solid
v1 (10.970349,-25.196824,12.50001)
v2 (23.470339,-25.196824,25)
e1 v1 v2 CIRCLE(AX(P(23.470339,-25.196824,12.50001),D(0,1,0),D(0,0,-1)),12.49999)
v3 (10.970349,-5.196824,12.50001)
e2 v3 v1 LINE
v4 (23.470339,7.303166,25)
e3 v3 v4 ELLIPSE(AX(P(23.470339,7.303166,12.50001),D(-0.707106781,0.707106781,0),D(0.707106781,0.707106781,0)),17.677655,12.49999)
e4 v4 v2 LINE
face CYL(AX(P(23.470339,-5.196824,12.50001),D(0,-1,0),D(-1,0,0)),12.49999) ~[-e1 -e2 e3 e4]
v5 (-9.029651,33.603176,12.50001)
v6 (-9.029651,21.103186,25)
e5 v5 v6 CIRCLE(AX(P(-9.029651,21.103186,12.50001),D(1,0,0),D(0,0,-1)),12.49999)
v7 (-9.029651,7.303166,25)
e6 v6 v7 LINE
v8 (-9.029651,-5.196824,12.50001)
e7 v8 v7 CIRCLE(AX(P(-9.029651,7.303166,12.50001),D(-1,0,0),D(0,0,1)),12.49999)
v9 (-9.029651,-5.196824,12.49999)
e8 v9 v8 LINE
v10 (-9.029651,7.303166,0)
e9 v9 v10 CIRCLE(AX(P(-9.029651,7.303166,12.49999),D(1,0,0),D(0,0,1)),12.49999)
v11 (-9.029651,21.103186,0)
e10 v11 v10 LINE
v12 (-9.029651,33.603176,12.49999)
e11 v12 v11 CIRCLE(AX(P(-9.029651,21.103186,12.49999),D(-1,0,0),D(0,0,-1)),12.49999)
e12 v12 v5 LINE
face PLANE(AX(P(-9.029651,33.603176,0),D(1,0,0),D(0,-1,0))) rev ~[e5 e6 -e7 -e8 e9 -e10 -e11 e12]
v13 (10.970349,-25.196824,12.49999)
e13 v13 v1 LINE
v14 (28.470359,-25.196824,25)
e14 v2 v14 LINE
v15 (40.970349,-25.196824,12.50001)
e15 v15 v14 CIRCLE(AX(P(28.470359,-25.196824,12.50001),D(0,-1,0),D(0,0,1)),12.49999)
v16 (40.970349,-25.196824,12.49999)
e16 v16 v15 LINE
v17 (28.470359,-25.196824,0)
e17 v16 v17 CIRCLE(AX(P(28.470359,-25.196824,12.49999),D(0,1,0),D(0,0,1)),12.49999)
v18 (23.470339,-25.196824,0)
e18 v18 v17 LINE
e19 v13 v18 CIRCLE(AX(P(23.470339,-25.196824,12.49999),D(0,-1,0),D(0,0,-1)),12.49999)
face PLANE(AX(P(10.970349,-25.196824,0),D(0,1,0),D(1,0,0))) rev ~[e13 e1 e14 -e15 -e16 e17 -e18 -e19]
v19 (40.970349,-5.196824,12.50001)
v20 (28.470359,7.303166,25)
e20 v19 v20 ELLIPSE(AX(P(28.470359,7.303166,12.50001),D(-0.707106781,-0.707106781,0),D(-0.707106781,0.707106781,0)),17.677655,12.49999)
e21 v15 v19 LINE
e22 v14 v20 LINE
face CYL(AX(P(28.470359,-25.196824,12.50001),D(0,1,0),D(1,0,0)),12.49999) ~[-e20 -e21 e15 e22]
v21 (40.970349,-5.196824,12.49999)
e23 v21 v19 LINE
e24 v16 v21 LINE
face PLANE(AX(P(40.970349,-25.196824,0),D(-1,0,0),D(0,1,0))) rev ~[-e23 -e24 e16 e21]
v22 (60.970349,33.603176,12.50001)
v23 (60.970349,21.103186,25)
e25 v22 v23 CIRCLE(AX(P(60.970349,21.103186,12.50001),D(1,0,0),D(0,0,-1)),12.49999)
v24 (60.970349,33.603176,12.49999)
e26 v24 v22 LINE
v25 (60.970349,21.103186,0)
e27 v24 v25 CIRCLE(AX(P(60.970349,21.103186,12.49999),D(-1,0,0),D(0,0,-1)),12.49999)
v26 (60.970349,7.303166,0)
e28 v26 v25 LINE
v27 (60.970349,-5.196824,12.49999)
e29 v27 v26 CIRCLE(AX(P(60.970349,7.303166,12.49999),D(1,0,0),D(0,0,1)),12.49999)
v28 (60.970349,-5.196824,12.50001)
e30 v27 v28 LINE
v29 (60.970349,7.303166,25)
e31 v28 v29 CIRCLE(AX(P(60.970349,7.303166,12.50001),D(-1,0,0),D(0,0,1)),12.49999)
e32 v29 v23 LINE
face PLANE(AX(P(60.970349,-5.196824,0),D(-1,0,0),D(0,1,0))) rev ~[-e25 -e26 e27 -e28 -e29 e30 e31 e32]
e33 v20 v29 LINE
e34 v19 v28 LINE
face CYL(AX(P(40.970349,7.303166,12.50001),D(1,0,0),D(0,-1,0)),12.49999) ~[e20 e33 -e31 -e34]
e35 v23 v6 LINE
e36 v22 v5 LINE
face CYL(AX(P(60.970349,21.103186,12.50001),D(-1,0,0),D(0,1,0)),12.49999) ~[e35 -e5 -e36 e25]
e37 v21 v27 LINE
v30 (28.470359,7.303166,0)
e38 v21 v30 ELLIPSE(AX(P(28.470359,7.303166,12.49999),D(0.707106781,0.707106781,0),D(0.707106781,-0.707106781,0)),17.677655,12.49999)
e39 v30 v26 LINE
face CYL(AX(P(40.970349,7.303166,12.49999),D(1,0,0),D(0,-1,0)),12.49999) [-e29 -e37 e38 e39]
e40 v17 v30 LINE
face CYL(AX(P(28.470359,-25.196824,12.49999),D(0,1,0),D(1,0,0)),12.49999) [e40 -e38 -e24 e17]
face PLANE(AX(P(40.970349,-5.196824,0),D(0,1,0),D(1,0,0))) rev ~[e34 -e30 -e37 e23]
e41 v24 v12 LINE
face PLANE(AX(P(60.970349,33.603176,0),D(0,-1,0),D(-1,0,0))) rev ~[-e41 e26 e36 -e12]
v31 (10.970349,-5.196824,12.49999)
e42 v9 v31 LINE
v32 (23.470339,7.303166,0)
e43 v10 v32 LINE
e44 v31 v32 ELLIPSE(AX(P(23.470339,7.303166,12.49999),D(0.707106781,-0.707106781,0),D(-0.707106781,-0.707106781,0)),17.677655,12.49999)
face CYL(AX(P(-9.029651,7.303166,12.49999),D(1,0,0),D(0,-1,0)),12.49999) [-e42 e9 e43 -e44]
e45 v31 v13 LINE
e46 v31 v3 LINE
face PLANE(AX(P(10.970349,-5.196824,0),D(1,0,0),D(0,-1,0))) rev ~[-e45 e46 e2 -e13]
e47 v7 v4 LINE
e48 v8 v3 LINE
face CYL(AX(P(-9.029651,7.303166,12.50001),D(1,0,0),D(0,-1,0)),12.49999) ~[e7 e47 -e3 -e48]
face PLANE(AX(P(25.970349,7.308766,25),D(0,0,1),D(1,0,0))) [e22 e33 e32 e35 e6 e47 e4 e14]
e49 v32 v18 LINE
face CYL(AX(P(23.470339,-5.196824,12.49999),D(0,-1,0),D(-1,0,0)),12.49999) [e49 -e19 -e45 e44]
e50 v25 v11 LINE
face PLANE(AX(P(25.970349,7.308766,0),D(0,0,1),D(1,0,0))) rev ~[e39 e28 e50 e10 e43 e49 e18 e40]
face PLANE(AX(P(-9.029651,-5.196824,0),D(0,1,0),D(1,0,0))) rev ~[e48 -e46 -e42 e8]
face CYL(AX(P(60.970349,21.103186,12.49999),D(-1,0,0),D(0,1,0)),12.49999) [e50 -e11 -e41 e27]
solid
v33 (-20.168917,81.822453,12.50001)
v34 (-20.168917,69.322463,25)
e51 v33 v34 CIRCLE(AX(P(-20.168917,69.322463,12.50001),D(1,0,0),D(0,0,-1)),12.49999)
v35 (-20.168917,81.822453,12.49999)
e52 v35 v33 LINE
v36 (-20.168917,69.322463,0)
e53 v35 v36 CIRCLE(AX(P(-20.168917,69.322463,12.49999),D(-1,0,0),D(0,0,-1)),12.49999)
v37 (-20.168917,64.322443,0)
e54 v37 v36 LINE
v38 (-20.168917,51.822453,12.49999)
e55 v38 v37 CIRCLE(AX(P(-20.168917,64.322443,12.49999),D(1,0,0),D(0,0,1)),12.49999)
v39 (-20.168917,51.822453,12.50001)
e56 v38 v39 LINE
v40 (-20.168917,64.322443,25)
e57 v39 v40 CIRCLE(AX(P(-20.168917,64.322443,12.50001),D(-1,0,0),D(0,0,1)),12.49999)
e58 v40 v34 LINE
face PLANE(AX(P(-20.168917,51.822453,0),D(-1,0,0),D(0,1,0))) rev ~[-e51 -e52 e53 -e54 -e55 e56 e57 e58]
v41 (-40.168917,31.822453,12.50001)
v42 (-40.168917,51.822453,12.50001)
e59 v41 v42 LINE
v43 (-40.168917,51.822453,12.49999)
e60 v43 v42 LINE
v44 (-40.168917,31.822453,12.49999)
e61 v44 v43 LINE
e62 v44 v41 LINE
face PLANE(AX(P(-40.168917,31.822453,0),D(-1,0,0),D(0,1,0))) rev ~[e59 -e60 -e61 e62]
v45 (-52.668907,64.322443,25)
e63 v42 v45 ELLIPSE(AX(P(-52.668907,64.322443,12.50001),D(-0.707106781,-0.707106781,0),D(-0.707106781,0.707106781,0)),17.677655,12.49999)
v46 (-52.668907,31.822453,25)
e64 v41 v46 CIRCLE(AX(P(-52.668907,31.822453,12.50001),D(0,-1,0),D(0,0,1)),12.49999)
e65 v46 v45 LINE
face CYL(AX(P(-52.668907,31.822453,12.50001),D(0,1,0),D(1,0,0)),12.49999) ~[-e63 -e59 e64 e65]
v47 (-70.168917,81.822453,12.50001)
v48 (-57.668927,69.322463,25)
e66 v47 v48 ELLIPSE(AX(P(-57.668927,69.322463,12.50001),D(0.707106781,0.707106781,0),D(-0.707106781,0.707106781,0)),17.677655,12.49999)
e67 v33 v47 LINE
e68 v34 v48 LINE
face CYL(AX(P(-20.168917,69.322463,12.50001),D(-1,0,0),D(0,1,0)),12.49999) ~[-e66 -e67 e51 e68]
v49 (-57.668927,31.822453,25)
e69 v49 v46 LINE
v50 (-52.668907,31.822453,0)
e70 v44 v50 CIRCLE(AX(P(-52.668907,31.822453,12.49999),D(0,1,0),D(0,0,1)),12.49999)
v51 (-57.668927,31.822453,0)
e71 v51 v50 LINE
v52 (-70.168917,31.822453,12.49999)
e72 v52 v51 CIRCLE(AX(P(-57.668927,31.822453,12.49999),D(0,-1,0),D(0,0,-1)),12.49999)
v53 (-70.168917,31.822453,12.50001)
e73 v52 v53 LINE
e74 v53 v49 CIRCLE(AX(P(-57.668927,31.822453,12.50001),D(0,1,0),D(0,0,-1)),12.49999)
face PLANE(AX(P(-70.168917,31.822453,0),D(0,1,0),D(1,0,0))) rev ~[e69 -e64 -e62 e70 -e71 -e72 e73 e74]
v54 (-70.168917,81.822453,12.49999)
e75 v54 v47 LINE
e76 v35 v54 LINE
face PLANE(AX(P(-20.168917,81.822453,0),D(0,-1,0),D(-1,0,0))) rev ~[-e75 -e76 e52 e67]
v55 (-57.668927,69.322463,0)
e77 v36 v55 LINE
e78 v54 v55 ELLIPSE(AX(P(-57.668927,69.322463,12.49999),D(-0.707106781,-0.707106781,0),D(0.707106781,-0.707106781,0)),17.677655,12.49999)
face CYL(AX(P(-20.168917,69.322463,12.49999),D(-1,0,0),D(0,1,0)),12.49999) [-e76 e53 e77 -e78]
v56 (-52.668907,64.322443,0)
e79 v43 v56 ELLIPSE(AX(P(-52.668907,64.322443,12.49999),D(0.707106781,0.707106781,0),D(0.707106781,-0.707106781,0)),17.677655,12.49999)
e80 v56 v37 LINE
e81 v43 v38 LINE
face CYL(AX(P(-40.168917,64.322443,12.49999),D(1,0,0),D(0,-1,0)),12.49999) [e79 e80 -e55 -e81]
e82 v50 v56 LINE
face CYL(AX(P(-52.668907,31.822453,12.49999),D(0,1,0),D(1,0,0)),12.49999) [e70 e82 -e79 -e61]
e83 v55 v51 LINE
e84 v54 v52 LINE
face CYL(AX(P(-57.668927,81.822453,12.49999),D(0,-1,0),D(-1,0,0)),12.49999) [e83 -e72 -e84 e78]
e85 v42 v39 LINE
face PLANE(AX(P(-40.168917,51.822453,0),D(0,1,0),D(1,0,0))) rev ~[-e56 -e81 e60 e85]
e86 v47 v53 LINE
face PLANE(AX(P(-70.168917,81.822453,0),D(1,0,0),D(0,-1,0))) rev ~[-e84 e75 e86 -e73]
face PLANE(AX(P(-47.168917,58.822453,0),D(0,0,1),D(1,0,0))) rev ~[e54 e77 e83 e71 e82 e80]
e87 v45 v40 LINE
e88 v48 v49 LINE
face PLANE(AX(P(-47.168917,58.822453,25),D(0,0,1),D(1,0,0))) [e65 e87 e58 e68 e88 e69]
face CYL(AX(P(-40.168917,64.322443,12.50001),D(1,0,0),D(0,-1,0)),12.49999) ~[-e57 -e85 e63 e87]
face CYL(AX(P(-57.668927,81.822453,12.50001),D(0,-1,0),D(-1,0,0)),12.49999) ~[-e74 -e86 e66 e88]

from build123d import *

# Parameters (mm, degrees)
F1_DEPTH = 25
F2_R     = 12.49999
F2_2_R   = 12.49999


# Not quite as in the source:
# - a fillet or chamfer is up to 0.001 mm smaller than in the source, because OpenCascade refuses the exact size


with BuildPart() as f1:
    # F0 (on Top) → F1 (new body)
    with BuildSketch(Plane.XY):
        Polygon((40.9703488648, -5.1968242228), (60.9703488648, -5.1968242228), (60.9703488648, 33.603176102), (25.9703488648, 33.603176102), (-9.0296511352, 33.603176102), (-9.0296511352, -5.1968242228), (10.9703488648, -5.1968242228), (10.9703488648, -25.1968242228), (25.9703488648, -25.1968242228), (40.9703488648, -25.1968242228), align=None)
        Polygon((35.9703488648, -20.1968242228), (25.9703488648, -20.1968242228), (15.9703488648, -20.1968242228), (15.9703488648, -0.1968242228), (-4.0296511352, -0.1968242228), (-4.0296511352, 28.603176102), (25.9703488648, 28.603176102), (55.9703488648, 28.603176102), (55.9703488648, -0.1968242228), (35.9703488648, -0.1968242228), align=None, mode=Mode.SUBTRACT)
        Polygon((15.9703488648, -20.1968242228), (25.9703488648, -20.1968242228), (25.9703488648, 28.603176102), (-4.0296511352, 28.603176102), (-4.0296511352, -0.1968242228), (15.9703488648, -0.1968242228), align=None)
        Polygon((25.9703488648, 28.603176102), (25.9703488648, -20.1968242228), (35.9703488648, -20.1968242228), (35.9703488648, -0.1968242228), (55.9703488648, -0.1968242228), (55.9703488648, 28.603176102), align=None)
    extrude(amount=F1_DEPTH)

    # F2#2 (radius 12.5 in the source; OpenCascade refuses exactly that, so slightly less here)
    f2_2_edges = [f1.edges().sort_by_distance(p)[0] for p in [
        (0.970349, -5.196824, 25),
        (10.970349, -15.196824, 25),
        (40.970349, -15.196824, 25),
        (50.970349, -5.196824, 25),
        (25.970349, 33.603176, 25),
        (50.970349, -5.196824, 0),
        (40.970349, -15.196824, 0),
        (10.970349, -15.196824, 0),
        (0.970349, -5.196824, 0),
        (25.970349, 33.603176, 0),
    ]]
    fillet(f2_2_edges, radius=F2_2_R)


with BuildPart() as f1b:
    # F0 (on Top) → F1, piece 2 (new body)
    with BuildSketch(Plane.XY):
        Polygon((-40.1689171791, 51.8224531412), (-20.1689171791, 51.8224531412), (-20.1689171791, 81.8224531412), (-70.1689171791, 81.8224531412), (-70.1689171791, 31.8224531412), (-40.1689171791, 31.8224531412), align=None)
        Polygon((-65.1689171791, 36.8224531412), (-65.1689171791, 76.8224531412), (-25.1689171791, 76.8224531412), (-25.1689171791, 56.8224531412), (-45.1689171791, 56.8224531412), (-45.1689171791, 36.8224531412), align=None, mode=Mode.SUBTRACT)
        Polygon((-25.1689171791, 76.8224531412), (-65.1689171791, 76.8224531412), (-65.1689171791, 36.8224531412), (-45.1689171791, 36.8224531412), (-45.1689171791, 56.8224531412), (-25.1689171791, 56.8224531412), align=None)
    extrude(amount=F1_DEPTH)

    # F2 (radius 12.5 in the source; OpenCascade refuses exactly that, so slightly less here)
    f2_edges = [f1b.edges().sort_by_distance(p)[0] for p in [
        (-45.168917, 81.822453, 25),
        (-70.168917, 56.822453, 25),
        (-40.168917, 41.822453, 25),
        (-30.168917, 51.822453, 25),
        (-70.168917, 56.822453, 0),
        (-45.168917, 81.822453, 0),
        (-30.168917, 51.822453, 0),
        (-40.168917, 41.822453, 0),
    ]]
    fillet(f2_edges, radius=F2_R)


solid = Compound([f1.part, f1b.part])
